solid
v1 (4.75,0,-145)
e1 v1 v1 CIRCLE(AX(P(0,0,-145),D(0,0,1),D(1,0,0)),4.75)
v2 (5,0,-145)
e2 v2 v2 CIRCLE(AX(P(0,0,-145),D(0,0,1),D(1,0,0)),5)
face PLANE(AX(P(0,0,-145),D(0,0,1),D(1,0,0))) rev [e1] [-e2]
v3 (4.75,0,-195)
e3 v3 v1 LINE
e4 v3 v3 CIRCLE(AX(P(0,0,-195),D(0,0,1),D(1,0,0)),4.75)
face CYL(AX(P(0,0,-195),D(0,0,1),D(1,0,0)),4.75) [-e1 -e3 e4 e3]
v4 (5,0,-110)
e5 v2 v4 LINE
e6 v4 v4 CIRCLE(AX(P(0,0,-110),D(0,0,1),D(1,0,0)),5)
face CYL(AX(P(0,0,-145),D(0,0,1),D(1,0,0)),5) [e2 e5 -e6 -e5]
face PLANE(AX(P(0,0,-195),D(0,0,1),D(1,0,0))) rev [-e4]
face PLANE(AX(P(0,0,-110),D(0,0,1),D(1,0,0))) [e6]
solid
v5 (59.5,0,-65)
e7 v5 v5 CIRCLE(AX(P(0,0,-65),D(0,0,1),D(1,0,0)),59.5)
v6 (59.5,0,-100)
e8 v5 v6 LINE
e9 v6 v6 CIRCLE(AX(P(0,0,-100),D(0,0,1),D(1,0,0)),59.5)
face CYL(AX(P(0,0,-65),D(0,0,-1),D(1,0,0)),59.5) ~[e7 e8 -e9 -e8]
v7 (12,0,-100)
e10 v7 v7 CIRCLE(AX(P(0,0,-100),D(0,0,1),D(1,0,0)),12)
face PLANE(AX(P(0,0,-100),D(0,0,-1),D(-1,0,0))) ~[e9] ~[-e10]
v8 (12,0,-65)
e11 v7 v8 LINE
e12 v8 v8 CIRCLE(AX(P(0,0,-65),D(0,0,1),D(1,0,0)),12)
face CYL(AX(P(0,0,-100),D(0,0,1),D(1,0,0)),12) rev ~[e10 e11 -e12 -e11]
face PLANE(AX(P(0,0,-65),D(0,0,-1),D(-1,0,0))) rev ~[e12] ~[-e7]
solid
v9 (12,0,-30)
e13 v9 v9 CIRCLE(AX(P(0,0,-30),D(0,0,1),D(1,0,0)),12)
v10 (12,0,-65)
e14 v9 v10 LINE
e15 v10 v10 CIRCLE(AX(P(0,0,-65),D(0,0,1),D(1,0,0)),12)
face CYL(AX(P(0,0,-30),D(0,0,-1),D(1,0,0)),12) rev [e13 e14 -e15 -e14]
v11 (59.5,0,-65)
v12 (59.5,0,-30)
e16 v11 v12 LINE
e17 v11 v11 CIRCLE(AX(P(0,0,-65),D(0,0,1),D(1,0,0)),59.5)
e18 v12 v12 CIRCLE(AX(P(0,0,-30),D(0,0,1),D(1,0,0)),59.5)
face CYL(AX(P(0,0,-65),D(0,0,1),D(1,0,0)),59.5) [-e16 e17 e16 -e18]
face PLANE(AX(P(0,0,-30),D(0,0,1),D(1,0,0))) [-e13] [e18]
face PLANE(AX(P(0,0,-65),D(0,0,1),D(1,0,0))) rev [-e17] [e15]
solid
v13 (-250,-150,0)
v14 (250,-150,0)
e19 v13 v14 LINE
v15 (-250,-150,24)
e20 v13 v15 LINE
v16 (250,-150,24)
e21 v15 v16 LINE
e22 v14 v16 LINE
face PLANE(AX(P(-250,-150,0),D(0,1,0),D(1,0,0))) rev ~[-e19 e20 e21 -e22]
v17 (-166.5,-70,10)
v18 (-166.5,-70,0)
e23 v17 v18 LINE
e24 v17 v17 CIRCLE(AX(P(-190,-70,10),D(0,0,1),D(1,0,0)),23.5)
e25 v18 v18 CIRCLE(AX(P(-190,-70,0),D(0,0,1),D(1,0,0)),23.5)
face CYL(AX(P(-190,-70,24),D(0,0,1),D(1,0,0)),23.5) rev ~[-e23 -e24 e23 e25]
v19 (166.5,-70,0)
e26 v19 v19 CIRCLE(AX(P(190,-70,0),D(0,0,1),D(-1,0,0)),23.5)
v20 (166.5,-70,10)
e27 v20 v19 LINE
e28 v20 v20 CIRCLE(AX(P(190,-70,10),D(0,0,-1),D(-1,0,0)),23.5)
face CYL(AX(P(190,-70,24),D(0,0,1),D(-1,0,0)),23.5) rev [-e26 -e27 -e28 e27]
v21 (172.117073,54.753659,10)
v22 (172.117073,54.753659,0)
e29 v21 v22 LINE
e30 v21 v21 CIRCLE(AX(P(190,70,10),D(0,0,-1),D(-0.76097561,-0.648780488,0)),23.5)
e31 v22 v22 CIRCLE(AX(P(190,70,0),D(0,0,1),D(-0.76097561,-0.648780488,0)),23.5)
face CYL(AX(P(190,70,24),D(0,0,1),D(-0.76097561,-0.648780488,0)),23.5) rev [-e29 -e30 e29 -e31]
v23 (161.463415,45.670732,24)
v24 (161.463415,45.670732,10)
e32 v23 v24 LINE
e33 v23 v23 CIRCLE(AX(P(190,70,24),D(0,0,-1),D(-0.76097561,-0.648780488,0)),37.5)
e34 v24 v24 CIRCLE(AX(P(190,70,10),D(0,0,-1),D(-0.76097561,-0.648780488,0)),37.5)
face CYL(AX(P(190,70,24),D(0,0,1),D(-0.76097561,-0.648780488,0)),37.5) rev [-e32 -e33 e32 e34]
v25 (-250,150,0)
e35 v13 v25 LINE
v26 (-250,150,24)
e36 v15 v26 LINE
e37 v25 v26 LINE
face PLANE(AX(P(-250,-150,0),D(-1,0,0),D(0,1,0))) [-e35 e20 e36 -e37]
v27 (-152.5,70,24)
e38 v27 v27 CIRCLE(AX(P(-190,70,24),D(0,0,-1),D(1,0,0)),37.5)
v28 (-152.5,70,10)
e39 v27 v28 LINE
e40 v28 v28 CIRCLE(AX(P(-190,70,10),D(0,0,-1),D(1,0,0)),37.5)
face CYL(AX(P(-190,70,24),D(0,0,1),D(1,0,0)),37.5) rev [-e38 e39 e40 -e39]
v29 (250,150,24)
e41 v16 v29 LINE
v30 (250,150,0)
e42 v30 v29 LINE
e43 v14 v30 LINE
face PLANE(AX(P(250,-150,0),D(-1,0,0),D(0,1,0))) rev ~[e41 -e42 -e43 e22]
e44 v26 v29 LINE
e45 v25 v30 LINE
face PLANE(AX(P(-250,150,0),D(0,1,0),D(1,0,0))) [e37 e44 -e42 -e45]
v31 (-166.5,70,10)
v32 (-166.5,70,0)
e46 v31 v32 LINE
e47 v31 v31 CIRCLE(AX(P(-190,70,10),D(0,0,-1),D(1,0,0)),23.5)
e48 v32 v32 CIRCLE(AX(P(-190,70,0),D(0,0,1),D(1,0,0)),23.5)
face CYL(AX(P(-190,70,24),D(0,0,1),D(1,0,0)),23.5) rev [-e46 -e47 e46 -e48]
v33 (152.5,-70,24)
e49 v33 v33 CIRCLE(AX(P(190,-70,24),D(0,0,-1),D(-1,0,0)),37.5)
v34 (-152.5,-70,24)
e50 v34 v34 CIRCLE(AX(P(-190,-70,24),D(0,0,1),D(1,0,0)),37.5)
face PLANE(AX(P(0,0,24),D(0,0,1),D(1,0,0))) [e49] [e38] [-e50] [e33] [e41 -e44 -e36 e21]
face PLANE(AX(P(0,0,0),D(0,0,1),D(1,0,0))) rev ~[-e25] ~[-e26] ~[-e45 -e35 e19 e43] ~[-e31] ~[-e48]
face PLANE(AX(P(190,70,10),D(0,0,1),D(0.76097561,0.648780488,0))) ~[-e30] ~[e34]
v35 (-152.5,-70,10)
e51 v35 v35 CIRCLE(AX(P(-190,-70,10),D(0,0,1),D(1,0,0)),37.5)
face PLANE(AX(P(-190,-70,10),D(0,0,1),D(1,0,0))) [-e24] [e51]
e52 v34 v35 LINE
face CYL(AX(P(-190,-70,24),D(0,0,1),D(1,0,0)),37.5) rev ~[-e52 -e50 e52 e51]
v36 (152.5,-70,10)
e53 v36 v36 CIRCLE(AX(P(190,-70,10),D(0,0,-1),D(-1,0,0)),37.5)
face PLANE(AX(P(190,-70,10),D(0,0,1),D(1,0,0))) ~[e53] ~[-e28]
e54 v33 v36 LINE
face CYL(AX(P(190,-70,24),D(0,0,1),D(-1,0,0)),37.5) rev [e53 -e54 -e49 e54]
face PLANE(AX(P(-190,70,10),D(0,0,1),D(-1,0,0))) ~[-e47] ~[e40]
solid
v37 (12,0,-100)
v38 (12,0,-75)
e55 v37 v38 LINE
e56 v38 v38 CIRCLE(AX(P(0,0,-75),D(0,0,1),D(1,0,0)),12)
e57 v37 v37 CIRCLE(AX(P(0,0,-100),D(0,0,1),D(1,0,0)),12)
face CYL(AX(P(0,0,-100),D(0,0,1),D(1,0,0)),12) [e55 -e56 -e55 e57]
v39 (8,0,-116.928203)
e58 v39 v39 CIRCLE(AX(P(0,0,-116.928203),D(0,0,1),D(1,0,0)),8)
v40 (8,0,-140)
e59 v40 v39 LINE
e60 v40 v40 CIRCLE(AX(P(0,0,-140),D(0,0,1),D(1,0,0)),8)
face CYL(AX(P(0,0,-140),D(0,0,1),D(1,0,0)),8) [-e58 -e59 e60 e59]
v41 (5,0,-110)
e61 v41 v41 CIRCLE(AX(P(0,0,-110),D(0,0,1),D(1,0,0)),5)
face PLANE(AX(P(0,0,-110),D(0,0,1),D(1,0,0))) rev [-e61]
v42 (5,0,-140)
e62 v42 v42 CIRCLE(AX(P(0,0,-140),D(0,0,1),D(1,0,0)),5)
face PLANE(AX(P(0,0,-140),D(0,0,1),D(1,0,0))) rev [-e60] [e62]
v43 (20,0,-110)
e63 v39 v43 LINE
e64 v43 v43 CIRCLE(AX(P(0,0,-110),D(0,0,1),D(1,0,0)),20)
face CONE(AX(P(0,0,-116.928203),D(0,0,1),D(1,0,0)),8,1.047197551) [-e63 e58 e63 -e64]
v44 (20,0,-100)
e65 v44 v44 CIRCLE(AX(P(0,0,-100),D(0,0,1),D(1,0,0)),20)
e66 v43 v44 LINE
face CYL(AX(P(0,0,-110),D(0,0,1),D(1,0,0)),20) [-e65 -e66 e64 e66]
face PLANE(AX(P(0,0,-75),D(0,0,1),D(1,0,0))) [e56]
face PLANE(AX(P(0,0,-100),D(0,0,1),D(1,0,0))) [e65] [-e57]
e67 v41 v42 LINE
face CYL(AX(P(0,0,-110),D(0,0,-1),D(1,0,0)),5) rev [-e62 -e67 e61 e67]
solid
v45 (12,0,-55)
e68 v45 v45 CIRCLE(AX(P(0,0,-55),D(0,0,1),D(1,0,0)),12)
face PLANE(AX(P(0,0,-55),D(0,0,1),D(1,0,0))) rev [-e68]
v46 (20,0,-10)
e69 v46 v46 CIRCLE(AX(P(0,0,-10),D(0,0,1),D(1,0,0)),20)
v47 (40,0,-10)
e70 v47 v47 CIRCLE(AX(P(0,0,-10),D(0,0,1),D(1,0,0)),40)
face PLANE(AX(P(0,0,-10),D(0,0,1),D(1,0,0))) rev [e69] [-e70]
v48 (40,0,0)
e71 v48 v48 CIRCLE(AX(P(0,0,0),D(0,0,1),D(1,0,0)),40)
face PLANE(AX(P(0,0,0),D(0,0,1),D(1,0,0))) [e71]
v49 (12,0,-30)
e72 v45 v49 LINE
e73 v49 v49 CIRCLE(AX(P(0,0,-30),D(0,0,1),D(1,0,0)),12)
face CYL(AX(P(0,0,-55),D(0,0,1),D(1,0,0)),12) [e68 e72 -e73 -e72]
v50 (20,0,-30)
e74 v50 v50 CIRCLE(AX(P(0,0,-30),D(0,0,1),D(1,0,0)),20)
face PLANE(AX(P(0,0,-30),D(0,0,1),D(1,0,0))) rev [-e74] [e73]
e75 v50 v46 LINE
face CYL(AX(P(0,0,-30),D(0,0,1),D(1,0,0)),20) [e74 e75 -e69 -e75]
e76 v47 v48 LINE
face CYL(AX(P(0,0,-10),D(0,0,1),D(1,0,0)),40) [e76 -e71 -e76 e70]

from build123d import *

# Parameters (mm, degrees)
F0_W     = 500
F0_H     = 300
F1_DEPTH = 24
F2_R     = 23.5
F3_DEPTH = 24.001
F2_R_2   = 37.5
F4_DEPTH = 14


# Not quite as in the source:
# - a pattern or mirror of a feature is missing from the dataset's text; its kind, count and spacing are read off the source's solid
# - a feature names something its author has since deleted; it is built from what else it names


with BuildPart() as f1:
    # F0 (on Top) → F1 (new body)
    with BuildSketch(Plane.XY):
        Rectangle(F0_W, F0_H)
    extrude(amount=F1_DEPTH)

    # F2 (on face) → F3 (cut, through all)
    with BuildSketch(Plane.XY.offset(24)):
        with Locations((-190, -70)):
            Circle(F2_R)
    f3 = extrude(amount=-F3_DEPTH, mode=Mode.SUBTRACT)

    # F3_copies: F3 across plane
    add(f3.mirror(Plane(origin=(0, 0, 0), x_dir=(-0.3457053588, 0.9383431168, 0), z_dir=(0.9383431168, 0.3457053588, 0))), mode=Mode.SUBTRACT)

    # F3_copies1: F3 across plane
    add(f3.mirror(Plane(origin=(0, 0, 0), x_dir=(0, 0, 1), z_dir=(1, 0, 0))), mode=Mode.SUBTRACT)

    # F3_copies2: F3 across plane
    add(f3.mirror(Plane.ZX), mode=Mode.SUBTRACT)

    # F2 (on face) → F4 (cut)
    with BuildSketch(Plane.XY.offset(24)):
        with Locations((-190, -70)):
            Circle(F2_R_2)
        with Locations((-190, -70)):
            Circle(F2_R, mode=Mode.SUBTRACT)
    f4 = extrude(amount=-F4_DEPTH, mode=Mode.SUBTRACT)

    # F4_copies: F4 across plane
    add(f4.mirror(Plane(origin=(0, 0, 0), x_dir=(0, 0, 1), z_dir=(1, 0, 0))), mode=Mode.SUBTRACT)

    # F4_copies1: F4 across plane
    add(f4.mirror(Plane.ZX), mode=Mode.SUBTRACT)

    # F4_copies2: F4 across plane
    add(f4.mirror(Plane(origin=(0, 0, 0), x_dir=(-0.3457053588, 0.9383431168, 0), z_dir=(0.9383431168, 0.3457053588, 0))), mode=Mode.SUBTRACT)


with BuildPart() as f6:
    # F5 (on Front) → F6 (revolve)
    with BuildSketch(Plane.XZ):
        Polygon((0, 0), (0, -55), (12, -55), (12, -30), (20, -30), (20, -10), (40, -10), (40, 0), align=None)
    revolve(axis=Axis((0, 0, -27.5), (0, 0, 1)))


with BuildPart() as f7:
    # F5 (on Front) → F7 (revolve)
    with BuildSketch(Plane.XZ):
        Polygon((12, -30), (12, -55), (12, -65), (59.5, -65), (59.5, -30), (20, -30), align=None)
    revolve(axis=Axis((0, 0, -27.5), (0, 0, 1)))


with BuildPart() as f8_1:
    # F8: instance of F7
    add(f7.part.mirror(Plane(origin=(0, 0, -65), x_dir=(1, 0, 0), z_dir=(0, 0, -1))))


with BuildPart() as f9:
    # F5 (on Front) → F9 (revolve)
    with BuildSketch(Plane.XZ):
        Polygon((12, -75), (0, -75), (0, -110), (5, -110), (5, -140), (8, -140), (8, -116.9282032303), (8, -110), (20, -110), (20, -100), (12, -100), align=None)
        Polygon((8, -116.9282032303), (20, -110), (8, -110), align=None)
    revolve(axis=Axis((0, 0, -92.5), (0, 0, 1)))


with BuildPart() as f10:
    # F5 (on Front) → F10 (revolve)
    with BuildSketch(Plane.XZ):
        Polygon((5, -110), (0, -110), (0, -195), (4.75, -195), (4.75, -145), (5, -145), (5, -140), align=None)
    revolve(axis=Axis((0, 0, -152.5), (0, 0, 1)))


solid = Compound([f1.part, f6.part, f7.part, f8_1.part, f9.part, f10.part])
